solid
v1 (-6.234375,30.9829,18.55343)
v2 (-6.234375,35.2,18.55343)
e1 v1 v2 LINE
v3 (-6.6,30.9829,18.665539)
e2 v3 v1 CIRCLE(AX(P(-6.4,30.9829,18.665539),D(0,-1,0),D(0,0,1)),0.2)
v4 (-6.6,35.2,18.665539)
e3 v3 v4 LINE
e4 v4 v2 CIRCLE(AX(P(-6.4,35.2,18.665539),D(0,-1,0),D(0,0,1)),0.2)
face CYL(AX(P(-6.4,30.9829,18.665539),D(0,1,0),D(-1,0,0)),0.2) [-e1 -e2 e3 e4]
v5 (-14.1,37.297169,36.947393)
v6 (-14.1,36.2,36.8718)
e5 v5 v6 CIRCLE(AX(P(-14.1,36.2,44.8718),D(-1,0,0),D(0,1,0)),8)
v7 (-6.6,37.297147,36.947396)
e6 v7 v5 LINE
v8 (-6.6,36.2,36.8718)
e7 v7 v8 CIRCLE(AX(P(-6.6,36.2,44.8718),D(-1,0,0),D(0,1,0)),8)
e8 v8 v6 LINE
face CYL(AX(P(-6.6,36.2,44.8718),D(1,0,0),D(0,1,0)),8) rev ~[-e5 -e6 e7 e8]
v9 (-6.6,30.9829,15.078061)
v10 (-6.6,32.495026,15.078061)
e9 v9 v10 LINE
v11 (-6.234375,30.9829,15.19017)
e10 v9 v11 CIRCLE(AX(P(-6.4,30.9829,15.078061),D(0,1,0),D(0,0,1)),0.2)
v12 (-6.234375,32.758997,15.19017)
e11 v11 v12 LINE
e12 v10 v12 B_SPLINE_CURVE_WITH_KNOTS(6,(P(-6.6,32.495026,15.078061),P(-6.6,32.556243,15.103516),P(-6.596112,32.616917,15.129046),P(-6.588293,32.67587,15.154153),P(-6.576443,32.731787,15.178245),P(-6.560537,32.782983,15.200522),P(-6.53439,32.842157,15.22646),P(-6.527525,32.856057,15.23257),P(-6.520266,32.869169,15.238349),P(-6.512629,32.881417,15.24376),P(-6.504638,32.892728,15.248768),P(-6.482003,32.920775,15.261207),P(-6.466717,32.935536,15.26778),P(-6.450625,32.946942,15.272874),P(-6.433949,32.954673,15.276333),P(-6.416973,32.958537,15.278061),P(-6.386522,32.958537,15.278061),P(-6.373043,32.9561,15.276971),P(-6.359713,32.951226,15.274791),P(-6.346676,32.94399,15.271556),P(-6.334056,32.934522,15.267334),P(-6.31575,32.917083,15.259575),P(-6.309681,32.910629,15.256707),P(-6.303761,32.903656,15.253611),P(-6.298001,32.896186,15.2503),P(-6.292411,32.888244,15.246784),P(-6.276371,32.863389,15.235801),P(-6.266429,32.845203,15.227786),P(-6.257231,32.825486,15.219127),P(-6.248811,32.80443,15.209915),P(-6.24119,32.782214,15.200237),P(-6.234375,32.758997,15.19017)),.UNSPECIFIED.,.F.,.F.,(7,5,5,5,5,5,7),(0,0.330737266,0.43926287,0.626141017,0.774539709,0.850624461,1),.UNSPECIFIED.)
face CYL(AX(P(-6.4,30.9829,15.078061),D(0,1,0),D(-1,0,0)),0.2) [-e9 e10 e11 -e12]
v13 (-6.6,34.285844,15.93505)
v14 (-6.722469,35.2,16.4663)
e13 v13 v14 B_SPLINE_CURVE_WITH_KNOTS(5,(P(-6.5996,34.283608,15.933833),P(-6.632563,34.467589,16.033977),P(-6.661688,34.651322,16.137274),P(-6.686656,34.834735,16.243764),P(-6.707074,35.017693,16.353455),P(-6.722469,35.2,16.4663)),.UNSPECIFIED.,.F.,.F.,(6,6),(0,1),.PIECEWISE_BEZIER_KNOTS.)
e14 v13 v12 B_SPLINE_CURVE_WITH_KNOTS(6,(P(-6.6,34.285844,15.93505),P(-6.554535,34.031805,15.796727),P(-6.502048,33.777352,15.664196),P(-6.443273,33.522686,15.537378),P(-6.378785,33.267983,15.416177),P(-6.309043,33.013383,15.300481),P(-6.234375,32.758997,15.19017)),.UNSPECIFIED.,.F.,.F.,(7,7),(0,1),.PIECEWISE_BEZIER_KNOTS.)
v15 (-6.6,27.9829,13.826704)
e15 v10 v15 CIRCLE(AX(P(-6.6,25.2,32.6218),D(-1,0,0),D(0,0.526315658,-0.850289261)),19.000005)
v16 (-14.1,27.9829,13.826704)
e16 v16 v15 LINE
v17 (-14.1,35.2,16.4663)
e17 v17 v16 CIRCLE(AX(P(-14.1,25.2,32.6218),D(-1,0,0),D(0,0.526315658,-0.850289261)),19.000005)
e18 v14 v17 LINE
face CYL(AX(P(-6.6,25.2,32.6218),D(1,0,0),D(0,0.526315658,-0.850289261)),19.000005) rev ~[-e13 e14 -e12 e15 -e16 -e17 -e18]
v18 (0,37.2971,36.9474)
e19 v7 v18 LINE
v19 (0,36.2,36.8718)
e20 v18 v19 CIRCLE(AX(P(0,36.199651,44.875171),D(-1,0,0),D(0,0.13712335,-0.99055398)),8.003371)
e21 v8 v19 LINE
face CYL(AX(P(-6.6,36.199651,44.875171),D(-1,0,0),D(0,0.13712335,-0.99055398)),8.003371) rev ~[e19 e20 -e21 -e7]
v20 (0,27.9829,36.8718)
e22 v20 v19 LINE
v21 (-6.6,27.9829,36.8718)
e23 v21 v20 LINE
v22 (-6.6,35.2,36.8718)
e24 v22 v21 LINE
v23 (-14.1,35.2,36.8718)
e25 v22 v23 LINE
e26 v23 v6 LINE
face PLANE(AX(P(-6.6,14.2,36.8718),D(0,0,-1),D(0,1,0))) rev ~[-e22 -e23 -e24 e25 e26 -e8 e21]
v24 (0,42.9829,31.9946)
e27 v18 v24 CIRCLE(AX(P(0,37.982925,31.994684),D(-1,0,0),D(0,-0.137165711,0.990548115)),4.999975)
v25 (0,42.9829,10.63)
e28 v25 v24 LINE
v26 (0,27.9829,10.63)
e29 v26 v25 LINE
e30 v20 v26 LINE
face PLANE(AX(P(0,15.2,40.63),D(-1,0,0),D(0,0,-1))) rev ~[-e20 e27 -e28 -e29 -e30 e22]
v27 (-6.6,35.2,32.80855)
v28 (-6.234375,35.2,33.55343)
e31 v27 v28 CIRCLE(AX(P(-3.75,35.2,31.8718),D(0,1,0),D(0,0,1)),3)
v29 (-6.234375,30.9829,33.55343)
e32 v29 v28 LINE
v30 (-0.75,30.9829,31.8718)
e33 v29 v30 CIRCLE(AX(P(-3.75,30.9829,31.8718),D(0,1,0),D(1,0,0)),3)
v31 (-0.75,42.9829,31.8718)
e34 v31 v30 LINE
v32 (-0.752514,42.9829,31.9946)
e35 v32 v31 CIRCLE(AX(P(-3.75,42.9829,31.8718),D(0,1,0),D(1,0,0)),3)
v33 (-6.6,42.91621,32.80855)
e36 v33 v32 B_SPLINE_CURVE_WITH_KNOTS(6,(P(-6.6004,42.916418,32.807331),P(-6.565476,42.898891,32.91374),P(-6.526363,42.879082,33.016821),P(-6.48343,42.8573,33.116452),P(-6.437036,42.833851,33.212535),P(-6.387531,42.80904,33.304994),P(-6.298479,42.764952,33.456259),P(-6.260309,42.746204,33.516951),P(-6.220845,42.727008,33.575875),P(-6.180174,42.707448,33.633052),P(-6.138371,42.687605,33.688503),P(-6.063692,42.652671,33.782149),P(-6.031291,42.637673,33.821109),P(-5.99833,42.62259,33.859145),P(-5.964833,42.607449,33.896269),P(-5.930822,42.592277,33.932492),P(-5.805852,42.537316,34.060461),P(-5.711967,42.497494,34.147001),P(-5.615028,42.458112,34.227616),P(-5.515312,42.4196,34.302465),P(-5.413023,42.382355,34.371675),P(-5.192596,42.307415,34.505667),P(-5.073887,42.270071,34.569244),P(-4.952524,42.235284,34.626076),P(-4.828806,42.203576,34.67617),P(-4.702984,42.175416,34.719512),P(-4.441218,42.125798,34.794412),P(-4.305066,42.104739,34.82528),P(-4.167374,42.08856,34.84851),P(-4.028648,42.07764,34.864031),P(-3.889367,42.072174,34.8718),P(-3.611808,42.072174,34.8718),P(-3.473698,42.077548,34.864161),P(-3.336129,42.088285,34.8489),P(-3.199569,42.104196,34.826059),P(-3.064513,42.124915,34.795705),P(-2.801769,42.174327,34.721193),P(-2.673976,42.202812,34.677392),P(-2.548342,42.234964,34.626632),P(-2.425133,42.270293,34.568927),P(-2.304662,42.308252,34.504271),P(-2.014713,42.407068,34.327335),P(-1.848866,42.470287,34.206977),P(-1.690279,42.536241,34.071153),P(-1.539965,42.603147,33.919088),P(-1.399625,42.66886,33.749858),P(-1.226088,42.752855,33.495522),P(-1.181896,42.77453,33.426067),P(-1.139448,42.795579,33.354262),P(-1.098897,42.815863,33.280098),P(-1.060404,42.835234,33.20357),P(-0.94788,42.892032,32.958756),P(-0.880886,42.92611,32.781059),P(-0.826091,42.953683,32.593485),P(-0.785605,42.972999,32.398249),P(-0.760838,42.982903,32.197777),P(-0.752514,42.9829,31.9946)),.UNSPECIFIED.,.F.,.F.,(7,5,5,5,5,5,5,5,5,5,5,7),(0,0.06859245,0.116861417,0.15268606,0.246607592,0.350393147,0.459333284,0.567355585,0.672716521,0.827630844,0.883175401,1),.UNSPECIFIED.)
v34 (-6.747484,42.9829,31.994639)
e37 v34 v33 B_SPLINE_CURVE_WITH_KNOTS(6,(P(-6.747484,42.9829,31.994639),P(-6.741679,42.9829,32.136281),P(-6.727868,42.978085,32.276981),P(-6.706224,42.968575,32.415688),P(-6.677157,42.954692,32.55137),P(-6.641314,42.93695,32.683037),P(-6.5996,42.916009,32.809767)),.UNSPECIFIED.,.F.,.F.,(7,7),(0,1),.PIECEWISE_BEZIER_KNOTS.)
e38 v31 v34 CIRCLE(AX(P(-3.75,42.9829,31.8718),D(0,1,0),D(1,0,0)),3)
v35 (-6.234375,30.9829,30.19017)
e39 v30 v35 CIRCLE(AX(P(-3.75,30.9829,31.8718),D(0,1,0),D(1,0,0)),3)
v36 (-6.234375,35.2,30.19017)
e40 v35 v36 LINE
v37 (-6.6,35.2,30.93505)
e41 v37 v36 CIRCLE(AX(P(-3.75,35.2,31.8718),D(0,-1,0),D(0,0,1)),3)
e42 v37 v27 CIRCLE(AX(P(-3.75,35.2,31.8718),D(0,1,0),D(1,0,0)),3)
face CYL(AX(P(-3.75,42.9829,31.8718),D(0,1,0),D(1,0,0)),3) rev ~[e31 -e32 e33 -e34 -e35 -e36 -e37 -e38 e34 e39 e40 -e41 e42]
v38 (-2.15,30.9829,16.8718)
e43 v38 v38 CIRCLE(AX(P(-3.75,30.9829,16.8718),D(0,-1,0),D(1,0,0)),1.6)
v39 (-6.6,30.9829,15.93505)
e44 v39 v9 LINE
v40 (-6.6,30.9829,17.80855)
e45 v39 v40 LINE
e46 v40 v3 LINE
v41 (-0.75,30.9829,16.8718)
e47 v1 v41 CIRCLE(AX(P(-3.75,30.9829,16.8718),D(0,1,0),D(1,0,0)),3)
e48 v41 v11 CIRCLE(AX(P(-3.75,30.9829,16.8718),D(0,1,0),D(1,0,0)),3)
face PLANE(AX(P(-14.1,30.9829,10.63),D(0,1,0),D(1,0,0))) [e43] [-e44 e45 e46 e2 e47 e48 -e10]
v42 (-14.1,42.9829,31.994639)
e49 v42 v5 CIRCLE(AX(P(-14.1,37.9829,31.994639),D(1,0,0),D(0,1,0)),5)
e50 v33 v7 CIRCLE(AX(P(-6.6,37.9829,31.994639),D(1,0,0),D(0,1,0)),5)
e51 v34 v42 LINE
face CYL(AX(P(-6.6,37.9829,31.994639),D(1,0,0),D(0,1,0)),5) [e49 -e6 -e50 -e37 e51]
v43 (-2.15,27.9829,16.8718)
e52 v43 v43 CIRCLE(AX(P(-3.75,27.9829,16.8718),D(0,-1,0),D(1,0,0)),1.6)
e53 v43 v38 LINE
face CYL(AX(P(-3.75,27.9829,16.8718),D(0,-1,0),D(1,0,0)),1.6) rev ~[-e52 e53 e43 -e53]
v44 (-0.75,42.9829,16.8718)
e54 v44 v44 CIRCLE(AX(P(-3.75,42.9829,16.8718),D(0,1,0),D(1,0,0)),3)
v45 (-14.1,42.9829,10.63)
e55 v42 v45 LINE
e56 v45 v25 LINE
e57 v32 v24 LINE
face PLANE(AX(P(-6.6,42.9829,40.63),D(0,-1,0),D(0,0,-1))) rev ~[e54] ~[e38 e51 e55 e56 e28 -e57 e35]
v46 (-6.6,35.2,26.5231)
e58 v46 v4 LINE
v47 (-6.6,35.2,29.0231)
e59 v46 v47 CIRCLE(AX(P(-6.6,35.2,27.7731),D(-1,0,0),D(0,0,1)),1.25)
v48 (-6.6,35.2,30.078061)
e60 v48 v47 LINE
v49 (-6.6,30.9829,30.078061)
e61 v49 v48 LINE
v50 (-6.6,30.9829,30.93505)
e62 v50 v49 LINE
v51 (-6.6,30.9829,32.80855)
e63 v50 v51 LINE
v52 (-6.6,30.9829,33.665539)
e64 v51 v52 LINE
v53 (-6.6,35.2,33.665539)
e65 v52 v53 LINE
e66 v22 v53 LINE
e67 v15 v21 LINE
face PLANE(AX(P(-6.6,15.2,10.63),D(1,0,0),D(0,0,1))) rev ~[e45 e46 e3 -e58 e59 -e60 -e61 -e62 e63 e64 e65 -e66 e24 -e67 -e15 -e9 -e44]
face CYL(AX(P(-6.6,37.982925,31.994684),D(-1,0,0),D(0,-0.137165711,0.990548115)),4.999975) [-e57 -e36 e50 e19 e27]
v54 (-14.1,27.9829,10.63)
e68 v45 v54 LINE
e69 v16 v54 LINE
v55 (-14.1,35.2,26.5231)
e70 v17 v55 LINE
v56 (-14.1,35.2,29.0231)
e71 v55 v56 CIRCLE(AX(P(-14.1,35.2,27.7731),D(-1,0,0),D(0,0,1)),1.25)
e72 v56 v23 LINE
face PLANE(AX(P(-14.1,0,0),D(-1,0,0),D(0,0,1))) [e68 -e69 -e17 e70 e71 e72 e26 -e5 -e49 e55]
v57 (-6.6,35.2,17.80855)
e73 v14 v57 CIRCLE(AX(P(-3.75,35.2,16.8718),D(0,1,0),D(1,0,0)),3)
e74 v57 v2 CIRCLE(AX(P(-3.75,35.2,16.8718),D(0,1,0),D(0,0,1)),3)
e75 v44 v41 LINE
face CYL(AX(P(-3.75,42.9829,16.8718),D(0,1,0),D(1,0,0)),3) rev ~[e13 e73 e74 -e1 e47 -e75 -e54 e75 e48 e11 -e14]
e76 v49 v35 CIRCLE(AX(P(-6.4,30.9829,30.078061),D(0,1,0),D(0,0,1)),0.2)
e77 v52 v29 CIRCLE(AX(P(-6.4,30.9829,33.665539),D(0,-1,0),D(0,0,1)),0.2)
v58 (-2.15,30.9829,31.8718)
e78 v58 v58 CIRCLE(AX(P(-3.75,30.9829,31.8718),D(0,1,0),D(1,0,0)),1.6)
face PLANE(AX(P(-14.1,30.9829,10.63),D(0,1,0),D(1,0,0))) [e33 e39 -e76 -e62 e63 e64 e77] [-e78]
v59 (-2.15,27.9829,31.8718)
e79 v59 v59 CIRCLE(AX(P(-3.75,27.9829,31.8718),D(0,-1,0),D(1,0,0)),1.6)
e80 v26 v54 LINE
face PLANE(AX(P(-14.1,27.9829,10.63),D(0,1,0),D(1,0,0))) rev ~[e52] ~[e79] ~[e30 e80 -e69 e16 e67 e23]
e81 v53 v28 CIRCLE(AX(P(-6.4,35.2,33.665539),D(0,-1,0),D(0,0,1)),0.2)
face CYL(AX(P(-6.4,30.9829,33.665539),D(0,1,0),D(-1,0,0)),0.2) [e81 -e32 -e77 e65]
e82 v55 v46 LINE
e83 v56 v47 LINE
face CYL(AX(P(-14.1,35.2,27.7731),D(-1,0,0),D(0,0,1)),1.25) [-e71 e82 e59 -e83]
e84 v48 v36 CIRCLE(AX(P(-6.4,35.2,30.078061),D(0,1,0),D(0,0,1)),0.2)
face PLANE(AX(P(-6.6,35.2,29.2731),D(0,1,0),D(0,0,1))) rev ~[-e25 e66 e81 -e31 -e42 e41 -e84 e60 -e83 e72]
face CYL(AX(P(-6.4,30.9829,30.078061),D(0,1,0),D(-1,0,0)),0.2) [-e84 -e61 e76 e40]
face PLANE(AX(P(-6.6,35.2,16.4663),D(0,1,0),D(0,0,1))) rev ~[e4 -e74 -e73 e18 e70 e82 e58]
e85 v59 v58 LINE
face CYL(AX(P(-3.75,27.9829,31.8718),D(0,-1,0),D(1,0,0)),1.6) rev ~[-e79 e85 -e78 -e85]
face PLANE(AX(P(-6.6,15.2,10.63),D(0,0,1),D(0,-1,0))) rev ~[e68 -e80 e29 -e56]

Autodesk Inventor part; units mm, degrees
ref_plane "YZ Plane" through (0, 0, 0) normal (1, 0, 0) x (0, 1, 0)
ref_plane "XZ Plane" through (0, 0, 0) normal (0, 1, 0) x (-1, 0, 0)
sketch "スケッチ1" plane through (0, 0, 0) normal (1, 0, 0) x (0, 1, 0)
  circle A0 centre (10, 5.37) radius 1.6
  circle A1 centre (10, -5.37) radius 1.6
  circle A2 centre (-10, -5.37) radius 1.6
  circle A3 centre (-10, 5.37) radius 1.6
  line L0 (-19.6, 0) -> (19.6, 0) projected
  line L1 (0, -13.118) -> (0, 13.118) projected
  line L2 (14, 9.37) -> (-14, 9.37)
  line L3 (-14, 9.37) -> (-14, -9.37)
  line L4 (-14, -9.37) -> (14, -9.37)
  line L5 (14, -9.37) -> (14, 9.37)
  point P0 (0, 0)
  dimension "d0" = 3.2
  dimension "d1" = 20
  dimension "d2" = 10.74
  dimension "d3" = 4
  dimension "d4" = 4
extrude "押し出し1" add sketch "スケッチ1" against normal blind 2
sketch "スケッチ2" plane through (0, 0, 0) normal (1, 0, 0) x (0, 0, -1)
  line L0 (9.37, 15.2) -> (-40.63, 15.2)
  line L1 (-40.63, 15.2) -> (-40.63, 0.2)
  line L2 (-40.63, 0.2) -> (9.37, 0.2)
  line L3 (9.37, 0.2) -> (9.37, 15.2)
  line L4 (9.37, -14) -> (9.37, 14) projected
  line L5 (9.37, 14) -> (-9.37, 14) projected
  circle A0 centre (-5.37, 10) radius 1.6 projected
  circle A1 centre (5.37, 10) radius 1.6 projected
  point P0 (0, 0)
  dimension "d7" = 1.2
  dimension "d8" = 50
  dimension "d9" = 15
extrude "押し出し2" add sketch "スケッチ2" against normal blind 6.6
sketch "スケッチ3" plane through (0, 15.2, 40.63) normal (0, 1, 0) x (1, 0, 0)
  line L0 (-6.6, 50) -> (-6.6, 0) projected
  line L1 (-6.6, 0) -> (0, 0)
  line L2 (0, 0) -> (0, 30)
  line L3 (0, 30) -> (-6.6, 30)
  line L4 (-6.6, 30) -> (-6.6, 0)
  line L5 (0, 50) -> (0, 0) projected
  point P0 (0, 40.63)
  dimension "d12" = 30
extrude "押し出し3" add sketch "スケッチ3" along normal blind 28
sketch "スケッチ4" plane through (-6.6, 0, 0) normal (-1, 0, 0) x (0, 0, 1)
  circle A0 centre (47.7718, 36.9277) radius 1.4 projected
  circle A1 centre (58.3718, 25.2) radius 1.4 projected
  circle A2 centre (55.0223, 40.3086) radius 1.4 projected
  circle A3 centre (50.3718, 25.2) radius 1.4 projected
  circle A4 centre (47.7718, 13.4723) radius 1.4 projected
  circle A5 centre (55.0223, 10.0914) radius 1.4 projected
  arc A6 (29.2731, 15.2) -> (26.2731, 15.2) centre (27.7731, 15.2) ccw projected
  line L0 (26.2731, 15.2) -> (16.4663, 15.2) projected
  arc A7 (16.4663, 35.2) -> (16.4663, 15.2) centre (32.6218, 25.2) ccw projected
  line L1 (16.4663, 35.2) -> (26.2731, 35.2) projected
  arc A8 (26.2731, 35.2) -> (29.2731, 35.2) centre (27.7731, 35.2) ccw projected
  line L2 (29.2731, 35.2) -> (36.8718, 35.2) projected
  line L3 (36.8718, 35.2) -> (36.8718, 36.2) projected
  arc A9 (44.8718, 44.2) -> (36.8718, 36.2) centre (44.8718, 36.2) ccw projected
  line L4 (44.8718, 44.2) -> (57.5369, 44.2) projected
  arc A10 (57.5369, 6.2) -> (57.5369, 44.2) centre (22.6218, 25.2) ccw projected
  line L5 (57.5369, 6.2) -> (44.8718, 6.2) projected
  arc A11 (36.8718, 14.2) -> (44.8718, 6.2) centre (44.8718, 14.2) ccw projected
  line L6 (36.8718, 14.2) -> (36.8718, 15.2) projected
  line L7 (36.8718, 15.2) -> (29.2731, 15.2) projected
  line L8 (-9.37, 0.2) -> (40.63, 0.2) projected
  line L9 (40.63, 0.2) -> (40.63, 43.2) projected
  line L10 (10.63, 43.2) -> (40.63, 43.2) projected
  line L11 (10.63, 15.2) -> (10.63, 43.2) projected
  line L12 (10.63, 15.2) -> (-9.37, 15.2) projected
  line L13 (-9.37, 15.2) -> (-9.37, 0.2) projected
  circle A12 centre (-5.37, 10) radius 1.6 projected
  circle A13 centre (5.37, 10) radius 1.6 projected
  line L14 (10.63, 15.2) -> (10.63, 0.2)
  line L15 (40.63, 42.9829) -> (10.63, 42.9829)
  point P0 (0, 0)
  point P1 (40.63, 7.4171)
extrude "押し出し4" add sketch "スケッチ4" along normal blind 7.5 contours L7 L6 A11 L9 L8 L14 L11 L15 A9 L3 L2 A8 L1 A7 L0 A6
sketch "スケッチ5" plane through (-14.1, 0, 0) normal (-1, 0, 0) x (0, 0, 1)
  arc A0 (26.2731, 35.2) -> (29.2731, 35.2) centre (27.7731, 35.2) ccw projected
  arc A1 (29.2731, 15.2) -> (26.2731, 15.2) centre (27.7731, 15.2) ccw projected
  circle A2 centre (27.7731, 35.2) radius 1.25
  circle A3 centre (27.7731, 15.2) radius 1.25
  line L0 (26.2731, 35.2) -> (29.2731, 35.2)
  line L1 (29.2731, 15.2) -> (26.2731, 15.2)
  point P0 (0, 0)
  point P1 (26.5231, 15.2)
  point P2 (29.0231, 15.2)
  point P3 (29.0231, 35.2)
  point P4 (26.5231, 35.2)
  dimension "d17" = 2.5
  dimension "d18" = 2.5
extrude "押し出し5" cut sketch "スケッチ5" against normal up to surface (7.5 mm away) contours L0 A2 A0 | L1 A3 A1
sketch "スケッチ6" plane through (-14.1, 0, 0) normal (-1, 0, 0) x (0, 0, 1)
  line L0 (40.63, 0.2) -> (40.63, 7.4171) projected
  line L1 (40.63, 0.2) -> (20.63, 0.2)
  line L2 (20.63, 0.2) -> (20.63, 7.4171)
  line L3 (20.63, 7.4171) -> (40.63, 7.4171)
  line L4 (40.63, 7.4171) -> (40.63, 0.2)
  point P0 (0, 0)
  dimension "d22" = 20
extrude "押し出し6" cut sketch "スケッチ6" against normal through all
fillet "フィレット2" radius 5 2 edges at (-10.35, 42.9829, 40.63) (-10.35, 7.4171, 40.63)
sketch "スケッチ7" plane through (-6.6, 0, 0) normal (-1, 0, 0) x (0, 0, 1)
  arc A0 (36.8718, 14.2) -> (36.9474, 13.1029) centre (44.8718, 14.2) ccw projected
  arc A1 (31.9946, 7.4171) -> (36.9474, 13.1029) centre (31.9946, 12.4171) ccw projected
  line L0 (31.9946, 7.4171) -> (40.63, 7.4171) projected
  line L1 (40.63, 7.4171) -> (40.63, 43.2) projected
  line L2 (10.63, 43.2) -> (40.63, 43.2) projected
  line L3 (10.63, 42.9829) -> (10.63, 43.2) projected
  line L4 (10.63, 42.9829) -> (31.9946, 42.9829) projected
  arc A2 (36.9474, 37.2971) -> (31.9946, 42.9829) centre (31.9946, 37.9829) ccw projected
  arc A3 (36.9474, 37.2971) -> (36.8718, 36.2) centre (44.8718, 36.2) ccw projected
  line L5 (36.8718, 36.2) -> (36.8718, 35.2) projected
  line L6 (36.8718, 35.2) -> (29.0231, 35.2) projected
  arc A4 (26.5231, 35.2) -> (29.0231, 35.2) centre (27.7731, 35.2) ccw projected
  line L7 (26.5231, 35.2) -> (16.4663, 35.2) projected
  arc A5 (16.4663, 35.2) -> (16.4663, 15.2) centre (32.6218, 25.2) ccw projected
  line L8 (16.4663, 15.2) -> (26.5231, 15.2) projected
  arc A6 (29.0231, 15.2) -> (26.5231, 15.2) centre (27.7731, 15.2) ccw projected
  line L9 (29.0231, 15.2) -> (36.8718, 15.2) projected
  line L10 (36.8718, 15.2) -> (36.8718, 14.2) projected
  line L11 (36.8718, 35.2) -> (36.8718, 15.2)
  point P0 (0, 0)
extrude "押し出し7" cut sketch "スケッチ7" against normal through all contours L10 L11 L5 A3 A2 L4 L3 L2 L1 L0 A1 A0
sketch "スケッチ8" plane through (0, 0, 0) normal (1, 0, 0) x (0, 0, -1)
  circle A0 centre (-19.37, 19.55) radius 1.6 projected
  circle A1 centre (-19.37, 19.55) radius 3.5
  point P0 (0, 0)
  dimension "d28" = 7
extrude "押し出し8" cut sketch "スケッチ8" against normal through all contours A0 | A1
ref_plane "作業平面1" through (-14.1, 27.9829, 10.63) normal (0, 1, 0) x (1, 0, 0)
sketch "スケッチ9" plane through (-14.1, 27.9829, 10.63) normal (0, 1, 0) x (1, 0, 0)
  line L0 (42.7294, 46.3445) -> (-18.2888, 46.3445)
  line L1 (-18.2888, 46.3445) -> (-18.2888, -73.0893)
  line L2 (-18.2888, -73.0893) -> (42.7294, -73.0893)
  line L3 (42.7294, -73.0893) -> (42.7294, 46.3445)
  point P0 (14.1, 10.63)
extrude "押し出し9" cut sketch "スケッチ9" against normal through all
sketch "スケッチ10" plane through (-14.1, 27.9829, 10.63) normal (0, -1, 0) x (1, 0, 0)
  circle A0 centre (10.35, 21.2418) radius 1.6 projected
  circle A1 centre (10.35, 6.2418) radius 1.6 projected
  point P0 (14.1, -10.63)
extrude "押し出し10" cut sketch "スケッチ10" against normal through all
sketch "スケッチ11" plane through (-14.1, 42.9829, 10.63) normal (0, 1, 0) x (1, 0, 0)
  circle A0 centre (10.35, -21.2418) radius 1.6 projected
  circle A1 centre (10.35, -6.2418) radius 1.6 projected
  circle A2 centre (10.35, -21.2418) radius 3
  circle A3 centre (10.35, -6.2418) radius 3
  point P0 (14.1, 10.63)
  dimension "d36" = 6
  dimension "d37" = 6
extrude "押し出し11" cut sketch "スケッチ11" against normal blind 12 contours A1 | A2 | A3
fillet "フィレット3" radius 0.2 4 edges at (-6.6, 32.6343, 15.935) (-6.6, 33.0914, 17.8085) (-6.6, 33.0914, 32.8085) (-6.6, 33.0914, 30.935)
equation "\"d4\" = d3"
equation "\"d18\" = d17"
properties part number "cam_setter_right_upper"
